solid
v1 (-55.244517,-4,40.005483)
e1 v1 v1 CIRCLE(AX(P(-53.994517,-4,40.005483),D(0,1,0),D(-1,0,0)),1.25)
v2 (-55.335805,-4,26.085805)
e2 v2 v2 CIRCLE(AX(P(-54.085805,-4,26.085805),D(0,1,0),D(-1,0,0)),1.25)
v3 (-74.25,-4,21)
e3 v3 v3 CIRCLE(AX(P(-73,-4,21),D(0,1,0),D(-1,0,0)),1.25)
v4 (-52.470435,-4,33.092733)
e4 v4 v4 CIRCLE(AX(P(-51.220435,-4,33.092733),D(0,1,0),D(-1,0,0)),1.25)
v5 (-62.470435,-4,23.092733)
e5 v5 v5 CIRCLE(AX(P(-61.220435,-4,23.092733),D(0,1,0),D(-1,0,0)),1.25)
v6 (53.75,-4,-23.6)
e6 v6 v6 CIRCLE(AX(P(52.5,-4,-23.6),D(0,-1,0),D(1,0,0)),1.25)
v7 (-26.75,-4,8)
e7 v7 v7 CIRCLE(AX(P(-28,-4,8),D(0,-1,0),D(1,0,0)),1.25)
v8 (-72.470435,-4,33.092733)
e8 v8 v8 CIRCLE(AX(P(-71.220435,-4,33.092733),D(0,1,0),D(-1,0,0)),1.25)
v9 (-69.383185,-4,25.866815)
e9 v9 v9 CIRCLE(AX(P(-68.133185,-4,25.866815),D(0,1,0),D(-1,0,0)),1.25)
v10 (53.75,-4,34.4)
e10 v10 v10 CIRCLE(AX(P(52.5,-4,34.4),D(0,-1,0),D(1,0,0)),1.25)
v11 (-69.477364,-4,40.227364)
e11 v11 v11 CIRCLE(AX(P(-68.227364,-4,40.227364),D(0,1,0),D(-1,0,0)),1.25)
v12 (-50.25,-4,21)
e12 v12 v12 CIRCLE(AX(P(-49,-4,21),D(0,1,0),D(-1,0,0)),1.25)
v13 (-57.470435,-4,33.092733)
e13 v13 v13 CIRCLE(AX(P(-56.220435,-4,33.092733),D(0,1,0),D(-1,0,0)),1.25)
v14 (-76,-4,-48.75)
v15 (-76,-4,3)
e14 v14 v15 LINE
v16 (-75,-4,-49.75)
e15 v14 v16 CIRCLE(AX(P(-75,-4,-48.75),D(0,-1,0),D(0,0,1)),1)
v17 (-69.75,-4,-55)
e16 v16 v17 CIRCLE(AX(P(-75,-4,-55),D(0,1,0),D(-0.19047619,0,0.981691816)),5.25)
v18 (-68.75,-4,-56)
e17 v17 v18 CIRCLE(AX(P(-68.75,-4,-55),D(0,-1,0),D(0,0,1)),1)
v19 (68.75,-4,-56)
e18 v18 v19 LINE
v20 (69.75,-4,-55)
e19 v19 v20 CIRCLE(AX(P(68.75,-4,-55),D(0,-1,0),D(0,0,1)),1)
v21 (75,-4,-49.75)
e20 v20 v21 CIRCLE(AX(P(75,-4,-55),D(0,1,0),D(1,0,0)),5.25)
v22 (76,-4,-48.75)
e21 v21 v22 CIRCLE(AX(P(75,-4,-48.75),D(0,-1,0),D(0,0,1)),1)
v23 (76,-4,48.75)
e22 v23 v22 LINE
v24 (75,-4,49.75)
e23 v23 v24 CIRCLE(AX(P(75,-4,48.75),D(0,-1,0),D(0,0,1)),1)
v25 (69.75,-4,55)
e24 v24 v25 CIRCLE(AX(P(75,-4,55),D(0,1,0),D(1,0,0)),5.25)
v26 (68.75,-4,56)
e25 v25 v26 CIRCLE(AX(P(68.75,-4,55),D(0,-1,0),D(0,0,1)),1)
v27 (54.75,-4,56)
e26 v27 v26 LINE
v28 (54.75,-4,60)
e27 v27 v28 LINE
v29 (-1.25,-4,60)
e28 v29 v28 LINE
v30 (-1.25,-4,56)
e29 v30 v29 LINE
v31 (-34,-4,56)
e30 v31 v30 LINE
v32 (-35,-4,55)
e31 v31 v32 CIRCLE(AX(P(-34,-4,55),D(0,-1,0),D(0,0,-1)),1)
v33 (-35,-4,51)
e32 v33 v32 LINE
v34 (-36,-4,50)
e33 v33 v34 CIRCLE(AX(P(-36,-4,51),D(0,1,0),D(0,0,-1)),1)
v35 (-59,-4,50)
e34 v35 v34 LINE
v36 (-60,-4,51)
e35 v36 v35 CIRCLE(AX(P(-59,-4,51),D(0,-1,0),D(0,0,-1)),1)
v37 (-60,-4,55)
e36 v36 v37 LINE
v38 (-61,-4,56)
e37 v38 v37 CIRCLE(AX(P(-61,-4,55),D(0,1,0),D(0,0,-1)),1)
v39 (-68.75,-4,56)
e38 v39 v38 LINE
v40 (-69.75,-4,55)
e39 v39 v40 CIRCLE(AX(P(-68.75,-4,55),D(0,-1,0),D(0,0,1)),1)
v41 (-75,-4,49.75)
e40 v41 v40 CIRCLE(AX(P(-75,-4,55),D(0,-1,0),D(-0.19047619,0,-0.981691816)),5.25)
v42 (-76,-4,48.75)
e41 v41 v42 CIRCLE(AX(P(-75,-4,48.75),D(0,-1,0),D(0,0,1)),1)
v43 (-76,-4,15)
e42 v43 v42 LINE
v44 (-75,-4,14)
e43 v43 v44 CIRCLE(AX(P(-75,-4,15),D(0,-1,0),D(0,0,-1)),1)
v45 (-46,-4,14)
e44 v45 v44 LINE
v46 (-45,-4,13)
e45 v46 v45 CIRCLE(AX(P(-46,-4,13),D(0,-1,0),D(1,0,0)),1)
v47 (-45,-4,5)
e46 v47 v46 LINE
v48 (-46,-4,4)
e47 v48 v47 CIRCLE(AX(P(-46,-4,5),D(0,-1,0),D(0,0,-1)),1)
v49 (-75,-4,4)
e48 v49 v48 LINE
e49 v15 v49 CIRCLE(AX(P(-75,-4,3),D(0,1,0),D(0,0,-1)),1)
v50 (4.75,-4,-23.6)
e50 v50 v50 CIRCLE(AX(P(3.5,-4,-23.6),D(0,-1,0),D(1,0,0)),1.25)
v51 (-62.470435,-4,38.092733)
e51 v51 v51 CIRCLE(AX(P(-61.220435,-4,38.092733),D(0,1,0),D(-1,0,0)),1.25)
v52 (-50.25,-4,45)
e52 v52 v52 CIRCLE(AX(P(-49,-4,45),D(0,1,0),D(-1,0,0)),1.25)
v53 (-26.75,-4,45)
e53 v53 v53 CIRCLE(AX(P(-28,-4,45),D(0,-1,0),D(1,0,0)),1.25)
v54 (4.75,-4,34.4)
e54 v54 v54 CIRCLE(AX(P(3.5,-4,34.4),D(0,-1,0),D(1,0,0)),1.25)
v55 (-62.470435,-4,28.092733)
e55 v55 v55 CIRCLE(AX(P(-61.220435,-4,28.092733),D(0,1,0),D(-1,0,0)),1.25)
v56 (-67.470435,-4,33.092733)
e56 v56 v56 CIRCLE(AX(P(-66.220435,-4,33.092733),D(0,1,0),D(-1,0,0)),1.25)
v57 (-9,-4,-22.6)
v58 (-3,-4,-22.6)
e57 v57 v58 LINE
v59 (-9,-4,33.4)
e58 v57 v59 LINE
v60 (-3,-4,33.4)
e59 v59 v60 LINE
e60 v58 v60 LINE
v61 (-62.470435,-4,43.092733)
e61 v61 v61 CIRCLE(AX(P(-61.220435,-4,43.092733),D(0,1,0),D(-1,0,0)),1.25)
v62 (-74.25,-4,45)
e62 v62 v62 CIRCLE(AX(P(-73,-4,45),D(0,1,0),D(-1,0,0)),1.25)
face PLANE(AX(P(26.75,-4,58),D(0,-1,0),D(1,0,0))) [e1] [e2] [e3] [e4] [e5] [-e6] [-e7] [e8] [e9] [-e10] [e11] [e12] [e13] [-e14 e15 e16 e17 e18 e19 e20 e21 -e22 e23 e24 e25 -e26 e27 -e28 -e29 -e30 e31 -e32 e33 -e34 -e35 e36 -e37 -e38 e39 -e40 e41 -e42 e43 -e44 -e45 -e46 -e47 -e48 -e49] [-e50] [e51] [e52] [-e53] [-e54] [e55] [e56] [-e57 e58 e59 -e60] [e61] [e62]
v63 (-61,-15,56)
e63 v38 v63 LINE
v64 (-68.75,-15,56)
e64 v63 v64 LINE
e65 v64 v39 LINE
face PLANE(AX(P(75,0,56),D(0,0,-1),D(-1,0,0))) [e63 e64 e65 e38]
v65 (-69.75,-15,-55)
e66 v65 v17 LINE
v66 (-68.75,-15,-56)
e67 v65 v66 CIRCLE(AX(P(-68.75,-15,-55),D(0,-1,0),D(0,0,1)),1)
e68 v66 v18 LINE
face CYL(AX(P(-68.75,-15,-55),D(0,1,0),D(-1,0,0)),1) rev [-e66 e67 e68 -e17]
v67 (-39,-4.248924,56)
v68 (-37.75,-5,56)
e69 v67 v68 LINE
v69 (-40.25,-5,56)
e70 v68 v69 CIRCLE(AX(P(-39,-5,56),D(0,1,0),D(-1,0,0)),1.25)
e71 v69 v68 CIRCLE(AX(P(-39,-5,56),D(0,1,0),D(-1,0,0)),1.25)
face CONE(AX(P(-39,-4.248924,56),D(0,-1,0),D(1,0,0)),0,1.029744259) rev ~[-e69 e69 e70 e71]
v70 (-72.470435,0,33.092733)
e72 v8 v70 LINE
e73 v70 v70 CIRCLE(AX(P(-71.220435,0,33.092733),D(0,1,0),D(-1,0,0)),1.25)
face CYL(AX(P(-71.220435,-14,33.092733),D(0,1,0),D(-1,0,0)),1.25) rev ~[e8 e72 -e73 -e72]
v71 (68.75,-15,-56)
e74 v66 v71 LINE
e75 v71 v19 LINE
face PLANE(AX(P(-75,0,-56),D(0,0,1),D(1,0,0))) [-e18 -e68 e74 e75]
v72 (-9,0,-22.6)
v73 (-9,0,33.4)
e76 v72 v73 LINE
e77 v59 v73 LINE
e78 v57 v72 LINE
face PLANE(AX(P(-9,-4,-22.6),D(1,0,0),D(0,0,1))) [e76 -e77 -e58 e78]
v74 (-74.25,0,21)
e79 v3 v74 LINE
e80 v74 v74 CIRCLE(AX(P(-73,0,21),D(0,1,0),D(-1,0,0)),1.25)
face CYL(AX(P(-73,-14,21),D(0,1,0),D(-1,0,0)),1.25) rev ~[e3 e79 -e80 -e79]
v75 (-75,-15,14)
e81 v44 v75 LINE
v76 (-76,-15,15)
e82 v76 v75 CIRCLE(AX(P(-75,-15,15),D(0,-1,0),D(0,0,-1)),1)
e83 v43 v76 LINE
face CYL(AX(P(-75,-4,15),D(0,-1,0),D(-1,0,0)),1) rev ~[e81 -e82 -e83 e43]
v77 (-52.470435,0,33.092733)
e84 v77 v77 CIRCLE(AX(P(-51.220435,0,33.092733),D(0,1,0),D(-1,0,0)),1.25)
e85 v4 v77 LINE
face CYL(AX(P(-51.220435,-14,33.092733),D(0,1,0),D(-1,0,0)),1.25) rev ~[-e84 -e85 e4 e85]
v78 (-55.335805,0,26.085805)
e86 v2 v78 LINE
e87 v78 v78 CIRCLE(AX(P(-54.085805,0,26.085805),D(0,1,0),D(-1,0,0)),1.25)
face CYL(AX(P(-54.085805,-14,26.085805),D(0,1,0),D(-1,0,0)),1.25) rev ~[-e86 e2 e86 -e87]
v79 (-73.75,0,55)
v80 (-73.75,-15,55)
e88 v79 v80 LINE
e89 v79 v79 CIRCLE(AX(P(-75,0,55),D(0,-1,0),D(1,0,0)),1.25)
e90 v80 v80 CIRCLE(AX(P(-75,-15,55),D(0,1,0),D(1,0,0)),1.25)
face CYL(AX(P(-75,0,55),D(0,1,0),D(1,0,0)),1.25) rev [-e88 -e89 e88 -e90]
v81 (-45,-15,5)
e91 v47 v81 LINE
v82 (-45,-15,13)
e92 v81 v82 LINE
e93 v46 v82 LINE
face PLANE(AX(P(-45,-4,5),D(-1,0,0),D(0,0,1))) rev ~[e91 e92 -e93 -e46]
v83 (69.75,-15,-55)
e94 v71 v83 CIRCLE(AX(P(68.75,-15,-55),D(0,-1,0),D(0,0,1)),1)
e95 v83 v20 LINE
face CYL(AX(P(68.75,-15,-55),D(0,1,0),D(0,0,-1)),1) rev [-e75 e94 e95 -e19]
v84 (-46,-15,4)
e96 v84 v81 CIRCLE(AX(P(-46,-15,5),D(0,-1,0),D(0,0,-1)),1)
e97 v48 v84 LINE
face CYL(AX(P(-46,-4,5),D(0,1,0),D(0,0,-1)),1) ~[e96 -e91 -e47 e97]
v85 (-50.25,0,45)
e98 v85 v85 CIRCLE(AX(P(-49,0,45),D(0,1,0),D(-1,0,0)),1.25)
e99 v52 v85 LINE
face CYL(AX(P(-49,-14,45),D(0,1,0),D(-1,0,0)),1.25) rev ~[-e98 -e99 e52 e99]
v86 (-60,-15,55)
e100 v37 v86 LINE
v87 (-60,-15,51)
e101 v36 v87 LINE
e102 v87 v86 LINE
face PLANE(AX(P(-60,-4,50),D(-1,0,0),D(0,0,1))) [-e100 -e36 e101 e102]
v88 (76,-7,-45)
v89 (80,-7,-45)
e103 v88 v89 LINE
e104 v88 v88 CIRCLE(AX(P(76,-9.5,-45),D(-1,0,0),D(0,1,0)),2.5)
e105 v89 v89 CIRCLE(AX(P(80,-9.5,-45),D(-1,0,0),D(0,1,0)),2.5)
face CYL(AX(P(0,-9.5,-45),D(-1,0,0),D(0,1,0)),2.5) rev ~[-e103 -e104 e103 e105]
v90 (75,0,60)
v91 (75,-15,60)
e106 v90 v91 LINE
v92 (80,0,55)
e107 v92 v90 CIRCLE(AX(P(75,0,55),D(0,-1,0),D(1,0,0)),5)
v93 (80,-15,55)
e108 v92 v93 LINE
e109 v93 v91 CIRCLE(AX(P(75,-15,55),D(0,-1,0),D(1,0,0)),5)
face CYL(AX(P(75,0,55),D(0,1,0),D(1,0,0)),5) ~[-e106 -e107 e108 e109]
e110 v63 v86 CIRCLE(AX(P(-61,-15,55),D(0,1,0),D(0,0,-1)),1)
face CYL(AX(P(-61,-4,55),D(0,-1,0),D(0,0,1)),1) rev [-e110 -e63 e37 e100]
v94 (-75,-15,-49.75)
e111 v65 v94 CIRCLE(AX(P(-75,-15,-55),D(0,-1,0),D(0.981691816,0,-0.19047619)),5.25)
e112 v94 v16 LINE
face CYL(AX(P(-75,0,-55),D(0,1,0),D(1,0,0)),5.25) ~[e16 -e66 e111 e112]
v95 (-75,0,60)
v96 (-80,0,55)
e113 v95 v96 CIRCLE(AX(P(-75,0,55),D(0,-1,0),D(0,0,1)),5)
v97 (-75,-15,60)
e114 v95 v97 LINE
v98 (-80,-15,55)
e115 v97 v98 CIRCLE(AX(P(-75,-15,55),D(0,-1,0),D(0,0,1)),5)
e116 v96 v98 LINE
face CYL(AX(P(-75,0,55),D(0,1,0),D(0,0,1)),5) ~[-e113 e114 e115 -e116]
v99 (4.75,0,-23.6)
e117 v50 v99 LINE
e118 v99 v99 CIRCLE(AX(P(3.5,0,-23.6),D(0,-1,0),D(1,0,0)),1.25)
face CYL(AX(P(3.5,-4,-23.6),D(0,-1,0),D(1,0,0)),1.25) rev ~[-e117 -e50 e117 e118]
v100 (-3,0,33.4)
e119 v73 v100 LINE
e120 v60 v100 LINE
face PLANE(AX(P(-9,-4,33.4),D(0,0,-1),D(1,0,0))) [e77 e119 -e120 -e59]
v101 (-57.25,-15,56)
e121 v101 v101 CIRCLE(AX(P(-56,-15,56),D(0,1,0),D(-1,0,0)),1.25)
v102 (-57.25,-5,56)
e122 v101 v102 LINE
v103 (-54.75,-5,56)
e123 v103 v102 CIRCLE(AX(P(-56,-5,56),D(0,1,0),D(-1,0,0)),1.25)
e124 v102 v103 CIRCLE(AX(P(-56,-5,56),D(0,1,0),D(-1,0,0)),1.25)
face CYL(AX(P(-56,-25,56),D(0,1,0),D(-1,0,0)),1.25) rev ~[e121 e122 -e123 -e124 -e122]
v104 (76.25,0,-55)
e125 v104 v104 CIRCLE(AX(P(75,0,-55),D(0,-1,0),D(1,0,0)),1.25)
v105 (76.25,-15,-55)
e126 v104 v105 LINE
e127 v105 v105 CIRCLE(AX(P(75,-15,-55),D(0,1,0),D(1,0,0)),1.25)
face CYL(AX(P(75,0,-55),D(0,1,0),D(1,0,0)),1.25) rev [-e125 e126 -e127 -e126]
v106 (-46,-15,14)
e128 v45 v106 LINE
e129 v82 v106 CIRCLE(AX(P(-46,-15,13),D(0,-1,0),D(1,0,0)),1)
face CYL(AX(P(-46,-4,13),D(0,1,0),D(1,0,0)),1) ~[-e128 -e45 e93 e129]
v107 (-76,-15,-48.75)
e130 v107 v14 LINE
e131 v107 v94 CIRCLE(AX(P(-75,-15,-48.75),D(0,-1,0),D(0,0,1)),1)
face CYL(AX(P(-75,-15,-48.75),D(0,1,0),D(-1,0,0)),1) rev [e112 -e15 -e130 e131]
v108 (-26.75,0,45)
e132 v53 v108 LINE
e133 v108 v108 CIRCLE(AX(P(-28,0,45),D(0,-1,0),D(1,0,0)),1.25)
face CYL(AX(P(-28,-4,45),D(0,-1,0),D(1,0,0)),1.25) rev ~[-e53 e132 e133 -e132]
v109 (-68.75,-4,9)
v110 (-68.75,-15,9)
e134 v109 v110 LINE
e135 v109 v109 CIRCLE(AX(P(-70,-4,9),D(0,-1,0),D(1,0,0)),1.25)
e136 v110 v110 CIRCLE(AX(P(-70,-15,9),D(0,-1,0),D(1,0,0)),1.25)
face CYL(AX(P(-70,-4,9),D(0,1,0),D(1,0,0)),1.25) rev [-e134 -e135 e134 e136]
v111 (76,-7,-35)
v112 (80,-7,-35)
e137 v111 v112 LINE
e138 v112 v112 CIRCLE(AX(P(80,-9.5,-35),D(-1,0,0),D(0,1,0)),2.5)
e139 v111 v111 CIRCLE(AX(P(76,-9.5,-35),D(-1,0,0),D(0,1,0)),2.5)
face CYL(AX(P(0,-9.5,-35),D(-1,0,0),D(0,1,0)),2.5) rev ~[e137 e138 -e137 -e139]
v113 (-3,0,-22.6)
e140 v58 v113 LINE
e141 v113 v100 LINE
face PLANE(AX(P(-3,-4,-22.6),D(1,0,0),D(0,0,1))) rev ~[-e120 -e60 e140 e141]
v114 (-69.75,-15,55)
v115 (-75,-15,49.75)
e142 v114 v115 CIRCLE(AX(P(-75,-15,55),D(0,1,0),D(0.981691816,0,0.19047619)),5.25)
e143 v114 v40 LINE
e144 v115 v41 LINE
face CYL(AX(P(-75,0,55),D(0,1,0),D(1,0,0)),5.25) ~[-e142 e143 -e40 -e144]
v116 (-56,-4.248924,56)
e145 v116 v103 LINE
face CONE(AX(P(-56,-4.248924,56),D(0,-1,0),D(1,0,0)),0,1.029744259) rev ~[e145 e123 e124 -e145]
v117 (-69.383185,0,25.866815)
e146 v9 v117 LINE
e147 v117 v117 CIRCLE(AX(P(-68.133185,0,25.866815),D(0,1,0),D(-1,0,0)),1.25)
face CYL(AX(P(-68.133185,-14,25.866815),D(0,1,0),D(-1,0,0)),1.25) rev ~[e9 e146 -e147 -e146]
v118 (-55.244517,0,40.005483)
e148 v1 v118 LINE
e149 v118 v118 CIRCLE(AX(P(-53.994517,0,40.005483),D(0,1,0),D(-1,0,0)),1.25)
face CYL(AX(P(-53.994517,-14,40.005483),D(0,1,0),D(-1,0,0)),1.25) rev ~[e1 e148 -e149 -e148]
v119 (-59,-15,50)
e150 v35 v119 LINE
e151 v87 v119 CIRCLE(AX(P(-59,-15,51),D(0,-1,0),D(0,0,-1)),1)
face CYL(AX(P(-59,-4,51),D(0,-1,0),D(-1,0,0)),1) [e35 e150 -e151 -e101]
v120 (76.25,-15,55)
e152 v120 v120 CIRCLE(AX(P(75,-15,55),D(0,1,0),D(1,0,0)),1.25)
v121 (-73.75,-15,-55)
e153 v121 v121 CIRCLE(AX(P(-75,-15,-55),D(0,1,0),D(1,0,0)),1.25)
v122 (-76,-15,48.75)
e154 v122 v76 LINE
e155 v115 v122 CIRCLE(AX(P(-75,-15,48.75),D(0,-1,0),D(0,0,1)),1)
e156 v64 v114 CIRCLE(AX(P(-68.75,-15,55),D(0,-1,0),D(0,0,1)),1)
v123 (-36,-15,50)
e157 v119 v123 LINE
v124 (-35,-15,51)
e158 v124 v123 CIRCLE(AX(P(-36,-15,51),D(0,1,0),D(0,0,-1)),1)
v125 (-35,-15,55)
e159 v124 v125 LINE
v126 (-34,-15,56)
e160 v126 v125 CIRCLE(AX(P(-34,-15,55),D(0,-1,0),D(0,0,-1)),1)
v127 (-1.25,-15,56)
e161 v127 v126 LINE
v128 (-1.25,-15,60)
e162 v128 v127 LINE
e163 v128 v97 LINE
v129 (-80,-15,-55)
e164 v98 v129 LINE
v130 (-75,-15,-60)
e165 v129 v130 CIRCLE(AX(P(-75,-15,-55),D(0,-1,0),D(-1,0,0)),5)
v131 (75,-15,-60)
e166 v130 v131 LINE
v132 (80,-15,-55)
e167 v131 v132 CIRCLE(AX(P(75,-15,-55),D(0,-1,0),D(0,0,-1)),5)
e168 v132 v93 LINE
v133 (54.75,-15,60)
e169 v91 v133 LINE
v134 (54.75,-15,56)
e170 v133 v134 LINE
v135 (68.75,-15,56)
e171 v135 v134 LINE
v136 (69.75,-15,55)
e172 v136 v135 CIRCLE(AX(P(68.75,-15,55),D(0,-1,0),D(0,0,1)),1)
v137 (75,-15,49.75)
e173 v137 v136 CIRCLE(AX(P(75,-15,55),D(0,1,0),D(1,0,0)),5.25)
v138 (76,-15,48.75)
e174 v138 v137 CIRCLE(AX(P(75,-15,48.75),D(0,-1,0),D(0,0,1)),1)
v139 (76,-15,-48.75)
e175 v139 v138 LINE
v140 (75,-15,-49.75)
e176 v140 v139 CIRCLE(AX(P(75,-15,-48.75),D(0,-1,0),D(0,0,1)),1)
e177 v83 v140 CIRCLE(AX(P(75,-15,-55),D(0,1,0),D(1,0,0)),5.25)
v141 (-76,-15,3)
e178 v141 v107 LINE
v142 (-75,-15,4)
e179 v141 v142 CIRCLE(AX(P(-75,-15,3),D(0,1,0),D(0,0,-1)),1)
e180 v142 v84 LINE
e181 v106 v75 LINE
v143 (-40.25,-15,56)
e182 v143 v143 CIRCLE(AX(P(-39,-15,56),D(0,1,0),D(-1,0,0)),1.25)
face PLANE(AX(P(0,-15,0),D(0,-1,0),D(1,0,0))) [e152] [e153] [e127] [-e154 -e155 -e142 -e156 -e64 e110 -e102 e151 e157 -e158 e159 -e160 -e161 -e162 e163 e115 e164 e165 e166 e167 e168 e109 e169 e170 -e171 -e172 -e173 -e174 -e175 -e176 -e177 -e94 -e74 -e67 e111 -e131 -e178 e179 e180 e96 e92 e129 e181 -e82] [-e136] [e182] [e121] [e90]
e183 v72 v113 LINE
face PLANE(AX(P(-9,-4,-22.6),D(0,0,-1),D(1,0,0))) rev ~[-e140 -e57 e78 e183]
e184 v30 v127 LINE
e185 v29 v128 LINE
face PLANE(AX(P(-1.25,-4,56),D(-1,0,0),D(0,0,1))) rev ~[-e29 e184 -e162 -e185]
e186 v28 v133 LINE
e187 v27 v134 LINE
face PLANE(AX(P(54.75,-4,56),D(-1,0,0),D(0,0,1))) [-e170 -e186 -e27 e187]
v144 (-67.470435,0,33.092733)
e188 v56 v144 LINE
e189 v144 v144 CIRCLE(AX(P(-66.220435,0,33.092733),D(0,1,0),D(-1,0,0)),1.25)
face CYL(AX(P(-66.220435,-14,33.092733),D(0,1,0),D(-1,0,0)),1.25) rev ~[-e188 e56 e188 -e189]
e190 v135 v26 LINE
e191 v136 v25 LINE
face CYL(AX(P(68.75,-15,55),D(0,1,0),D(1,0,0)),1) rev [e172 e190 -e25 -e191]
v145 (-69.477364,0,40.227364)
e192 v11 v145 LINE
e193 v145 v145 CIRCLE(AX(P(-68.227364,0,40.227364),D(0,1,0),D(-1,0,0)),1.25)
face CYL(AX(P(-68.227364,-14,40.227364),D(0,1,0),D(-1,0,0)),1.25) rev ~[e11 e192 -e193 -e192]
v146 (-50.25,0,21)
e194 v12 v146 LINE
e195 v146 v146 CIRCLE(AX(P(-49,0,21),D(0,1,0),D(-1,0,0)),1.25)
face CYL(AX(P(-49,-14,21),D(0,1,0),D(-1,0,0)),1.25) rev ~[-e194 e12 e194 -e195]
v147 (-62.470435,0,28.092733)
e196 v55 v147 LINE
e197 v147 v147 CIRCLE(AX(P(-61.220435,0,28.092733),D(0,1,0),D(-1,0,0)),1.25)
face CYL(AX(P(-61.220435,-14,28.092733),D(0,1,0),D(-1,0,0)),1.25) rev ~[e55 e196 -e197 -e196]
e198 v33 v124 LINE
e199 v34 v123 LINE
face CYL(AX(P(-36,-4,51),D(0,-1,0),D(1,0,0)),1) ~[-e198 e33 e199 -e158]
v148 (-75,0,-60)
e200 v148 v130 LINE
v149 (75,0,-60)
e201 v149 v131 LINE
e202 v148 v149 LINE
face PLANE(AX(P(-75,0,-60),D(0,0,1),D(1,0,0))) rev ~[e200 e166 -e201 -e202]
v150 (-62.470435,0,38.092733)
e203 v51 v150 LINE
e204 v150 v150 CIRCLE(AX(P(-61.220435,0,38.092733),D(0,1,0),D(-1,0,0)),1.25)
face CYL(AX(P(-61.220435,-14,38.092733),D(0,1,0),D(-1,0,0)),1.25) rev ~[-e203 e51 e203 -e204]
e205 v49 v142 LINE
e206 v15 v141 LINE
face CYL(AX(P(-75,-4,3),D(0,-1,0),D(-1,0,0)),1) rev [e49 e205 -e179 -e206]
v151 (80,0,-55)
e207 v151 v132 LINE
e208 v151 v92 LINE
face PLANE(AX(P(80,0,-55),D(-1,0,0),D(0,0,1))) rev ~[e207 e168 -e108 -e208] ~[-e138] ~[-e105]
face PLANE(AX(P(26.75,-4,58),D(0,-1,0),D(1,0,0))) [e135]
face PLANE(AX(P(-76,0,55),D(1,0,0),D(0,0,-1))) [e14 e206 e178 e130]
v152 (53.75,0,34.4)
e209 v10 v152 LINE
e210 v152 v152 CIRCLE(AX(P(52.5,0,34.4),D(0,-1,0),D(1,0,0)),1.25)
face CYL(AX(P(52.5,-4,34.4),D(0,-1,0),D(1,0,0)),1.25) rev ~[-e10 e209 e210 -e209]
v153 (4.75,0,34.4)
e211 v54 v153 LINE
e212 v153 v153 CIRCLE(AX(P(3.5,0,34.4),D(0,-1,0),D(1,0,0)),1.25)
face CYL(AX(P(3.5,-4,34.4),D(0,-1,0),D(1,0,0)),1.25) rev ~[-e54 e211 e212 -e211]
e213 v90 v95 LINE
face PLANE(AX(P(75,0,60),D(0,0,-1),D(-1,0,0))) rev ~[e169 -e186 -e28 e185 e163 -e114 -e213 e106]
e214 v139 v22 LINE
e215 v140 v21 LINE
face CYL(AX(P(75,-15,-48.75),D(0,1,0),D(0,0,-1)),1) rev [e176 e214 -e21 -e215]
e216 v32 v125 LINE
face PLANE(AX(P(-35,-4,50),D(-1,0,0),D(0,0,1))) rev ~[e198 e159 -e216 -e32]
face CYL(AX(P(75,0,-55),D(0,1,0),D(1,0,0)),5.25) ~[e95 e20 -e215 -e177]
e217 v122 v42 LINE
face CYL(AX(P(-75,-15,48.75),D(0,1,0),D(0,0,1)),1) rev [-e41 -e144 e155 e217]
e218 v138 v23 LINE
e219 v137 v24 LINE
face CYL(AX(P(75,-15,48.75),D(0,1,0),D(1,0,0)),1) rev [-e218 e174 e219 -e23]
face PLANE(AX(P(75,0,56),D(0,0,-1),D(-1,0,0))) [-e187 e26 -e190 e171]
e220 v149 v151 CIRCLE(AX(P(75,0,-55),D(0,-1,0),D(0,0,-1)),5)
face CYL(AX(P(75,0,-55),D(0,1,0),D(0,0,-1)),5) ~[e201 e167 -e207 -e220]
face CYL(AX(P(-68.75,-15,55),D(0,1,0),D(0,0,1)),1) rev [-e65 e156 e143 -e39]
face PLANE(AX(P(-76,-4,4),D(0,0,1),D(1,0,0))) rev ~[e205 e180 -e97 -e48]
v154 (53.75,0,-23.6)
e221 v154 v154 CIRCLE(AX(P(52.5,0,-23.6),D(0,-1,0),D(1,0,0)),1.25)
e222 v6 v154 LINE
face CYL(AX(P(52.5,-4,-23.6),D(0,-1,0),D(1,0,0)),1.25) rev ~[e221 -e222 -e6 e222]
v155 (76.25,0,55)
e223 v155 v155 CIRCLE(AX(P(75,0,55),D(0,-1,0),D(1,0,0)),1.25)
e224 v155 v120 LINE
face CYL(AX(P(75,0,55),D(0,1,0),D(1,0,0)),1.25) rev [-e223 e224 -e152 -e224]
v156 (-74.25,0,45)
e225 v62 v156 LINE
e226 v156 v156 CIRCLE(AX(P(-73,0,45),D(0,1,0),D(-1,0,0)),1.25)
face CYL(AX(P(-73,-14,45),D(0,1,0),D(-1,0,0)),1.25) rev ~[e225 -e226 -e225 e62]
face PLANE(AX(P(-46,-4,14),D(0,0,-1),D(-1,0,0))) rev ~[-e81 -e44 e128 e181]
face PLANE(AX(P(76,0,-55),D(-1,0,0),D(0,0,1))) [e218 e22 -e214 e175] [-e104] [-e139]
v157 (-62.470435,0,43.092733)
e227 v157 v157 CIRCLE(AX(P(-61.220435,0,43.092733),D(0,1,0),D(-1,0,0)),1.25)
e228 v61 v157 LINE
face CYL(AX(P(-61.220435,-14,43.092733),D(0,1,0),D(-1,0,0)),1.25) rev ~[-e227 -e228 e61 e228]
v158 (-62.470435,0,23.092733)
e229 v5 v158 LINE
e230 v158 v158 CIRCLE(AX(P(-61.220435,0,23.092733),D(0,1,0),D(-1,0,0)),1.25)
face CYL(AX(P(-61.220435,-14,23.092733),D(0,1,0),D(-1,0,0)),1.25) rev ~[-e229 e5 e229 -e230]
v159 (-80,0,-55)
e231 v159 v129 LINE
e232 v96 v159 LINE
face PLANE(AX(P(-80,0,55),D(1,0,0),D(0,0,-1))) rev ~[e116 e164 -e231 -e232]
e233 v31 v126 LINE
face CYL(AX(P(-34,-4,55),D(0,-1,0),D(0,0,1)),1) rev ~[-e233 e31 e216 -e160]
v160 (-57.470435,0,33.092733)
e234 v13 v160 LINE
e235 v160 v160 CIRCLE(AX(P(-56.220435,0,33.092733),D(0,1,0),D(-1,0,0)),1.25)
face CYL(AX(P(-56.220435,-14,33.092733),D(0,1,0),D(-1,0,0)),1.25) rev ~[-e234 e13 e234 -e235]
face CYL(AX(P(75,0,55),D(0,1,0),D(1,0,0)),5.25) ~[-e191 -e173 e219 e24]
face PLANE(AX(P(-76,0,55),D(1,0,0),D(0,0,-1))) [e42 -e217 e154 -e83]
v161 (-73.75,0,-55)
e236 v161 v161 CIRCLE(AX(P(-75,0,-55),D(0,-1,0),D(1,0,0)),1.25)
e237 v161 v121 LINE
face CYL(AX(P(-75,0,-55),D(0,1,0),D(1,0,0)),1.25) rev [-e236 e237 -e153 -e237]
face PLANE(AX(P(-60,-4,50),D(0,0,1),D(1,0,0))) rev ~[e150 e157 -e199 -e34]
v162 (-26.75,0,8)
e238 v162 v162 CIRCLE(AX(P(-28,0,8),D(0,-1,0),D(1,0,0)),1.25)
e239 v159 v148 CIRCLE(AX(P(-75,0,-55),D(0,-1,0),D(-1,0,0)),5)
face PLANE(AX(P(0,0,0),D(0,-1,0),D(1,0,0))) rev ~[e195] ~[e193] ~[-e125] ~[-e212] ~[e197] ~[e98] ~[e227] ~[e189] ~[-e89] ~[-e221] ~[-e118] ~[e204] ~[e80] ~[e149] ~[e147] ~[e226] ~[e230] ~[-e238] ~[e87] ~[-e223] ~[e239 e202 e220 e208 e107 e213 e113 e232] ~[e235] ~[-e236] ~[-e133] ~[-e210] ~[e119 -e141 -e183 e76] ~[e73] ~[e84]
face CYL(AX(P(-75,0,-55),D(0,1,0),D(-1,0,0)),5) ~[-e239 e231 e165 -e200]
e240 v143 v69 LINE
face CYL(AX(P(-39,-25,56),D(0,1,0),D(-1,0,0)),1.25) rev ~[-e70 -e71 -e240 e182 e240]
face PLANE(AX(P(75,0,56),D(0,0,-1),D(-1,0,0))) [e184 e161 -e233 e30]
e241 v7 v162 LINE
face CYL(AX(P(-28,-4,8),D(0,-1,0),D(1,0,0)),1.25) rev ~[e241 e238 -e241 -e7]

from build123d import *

# Parameters (mm, degrees)
F1_DEPTH  = 15
F2_R      = 1.25
F3_DEPTH  = 25
F4_T      = 4
F5_R      = 1.25
F6_DEPTH  = 25
F7_W      = 56
F7_H      = 4
F8_DEPTH  = 25
F9_W      = 25
F9_H      = 6
F10_DEPTH = 11
F11_R     = 1
F13_D     = 2.5
F13_DEPTH = 10
F13_TIP   = 0.7510757738
F15_D     = 2.5
F15_DEPTH = 10
F15_TIP   = 0.7510757738
F16_R     = 1.25
F17_DEPTH = 11
F18_R     = 1
F20_D     = 2.5
F20_DEPTH = 10
F20_TIP   = 0.7510757738
F21_W     = 6
F21_H     = 56
F22_DEPTH = 25
F24_D     = 5
F24_DEPTH = 100
F24_TIP   = 1.5021515476
F25_R     = 1.25
F26_DEPTH = 5


# Not quite as in the source:
# - a shell that OpenCascade refuses in one call is made with other operations: the cavity is built on its own and cut out


with BuildPart() as f1:
    # F0 (on Front) → F1 (new body)
    with BuildSketch(Plane.XZ):
        with BuildLine():
            Line((-75, -60), (75, -60))
            ThreePointArc((75, -60), (78.5355339059, -58.5355339059), (80, -55))
            Line((80, -55), (80, 55))
            ThreePointArc((80, 55), (78.5355339059, 58.5355339059), (75, 60))
            Line((75, 60), (-75, 60))
            ThreePointArc((-75, 60), (-78.5355339059, 58.5355339059), (-80, 55))
            Line((-80, 55), (-80, -55))
            ThreePointArc((-80, -55), (-78.5355339059, -58.5355339059), (-75, -60))
        make_face()
    extrude(amount=F1_DEPTH)

    # F2 (on Front) → F3 (cut)
    with BuildSketch(Plane.XZ):
        with Locations((-75, 55)):
            Circle(F2_R)
        with Locations((75, 55)):
            Circle(F2_R)
        with Locations((75, -55)):
            Circle(F2_R)
        with Locations((-75, -55)):
            Circle(F2_R)
    extrude(amount=F3_DEPTH, mode=Mode.SUBTRACT)

    # F4: shell of thickness 4, made by hand


with BuildPart() as f4_core1:
    # F4_t2: copy of F1
    add(f1.part)

    # the walls: a layer under each face that stays
    f4_faces = [f4_core1.faces().sort_by_distance(p)[0] for p in [
        (0, -7.5, -60),
        (-78.5355339059, -7.5, -58.5355339059),
        (78.5355339059, -7.5, -58.5355339059),
        (0, 0, 0),
        (-80, -7.5, 0),
        (80, -7.5, 0),
        (-78.5355339059, -7.5, 58.5355339059),
        (78.5355339059, -7.5, 58.5355339059),
        (0, -7.5, 60),
        (-76.25, -7.5, -55),
        (73.75, -7.5, -55),
        (-76.25, -7.5, 55),
        (73.75, -7.5, 55),
    ]]
    thicken(f4_faces, amount=-F4_T, mode=Mode.SUBTRACT)


with BuildPart() as f1_1:
    add(f1.part)

    # what is left inside the walls is the cavity
    f4_cavity = [f4_core1.part.solids().sort_by_distance(p)[0] for p in [
        (0, -4.04, -18.666667),
    ]]
    add(f4_cavity, mode=Mode.SUBTRACT)

    # F5 (on face) → F6 (cut)
    with BuildSketch(Plane.XZ.offset(4)):
        with Locations((3.5, 34.4)):
            Circle(F5_R)
        with Locations((52.5, 34.4)):
            Circle(F5_R)
        with Locations((52.5, -23.6)):
            Circle(F5_R)
        with Locations((3.5, -23.6)):
            Circle(F5_R)
    extrude(amount=-F6_DEPTH, mode=Mode.SUBTRACT)

    # F7 (on face) → F8 (cut)
    with BuildSketch(Plane.XZ.offset(4)):
        with Locations((26.75, 58)):
            Rectangle(F7_W, F7_H)
    extrude(amount=F8_DEPTH, mode=Mode.SUBTRACT)

    # F9 (on face) → F10 (join)
    with BuildSketch(Plane.XZ.offset(4)):
        with Locations((-47.5, 53)):
            Rectangle(F9_W, F9_H)
    extrude(amount=F10_DEPTH)

    # F11
    f11_edges = [f1_1.edges().sort_by_distance(p)[0] for p in [
        (-60, -9.5, 56),
        (-60, -9.5, 50),
        (-35, -9.5, 50),
        (-35, -9.5, 56),
    ]]
    fillet(f11_edges, radius=F11_R)

    # F13
    with Locations(Plane.XZ.offset(15)):
        with Locations((-56, 56), (-39, 56)):
            Hole(F13_D / 2, depth=F13_DEPTH)
            with Locations((0, 0, -(F13_DEPTH + F13_TIP / 2))):  # 118° drill point
                Cone(0, F13_D / 2, F13_TIP, mode=Mode.SUBTRACT)

    # F15
    with Locations(Plane.XZ.offset(4)):
        with Locations((-49, 45), (-73, 45), (-73, 21), (-49, 21)):
            Hole(F15_D / 2, depth=F15_DEPTH)
            with Locations((0, 0, -(F15_DEPTH + F15_TIP / 2))):  # 118° drill point
                Cone(0, F15_D / 2, F15_TIP, mode=Mode.SUBTRACT)

    # F16 (on face) → F17 (join)
    with BuildSketch(Plane.XZ.offset(4)):
        with BuildLine():
            Line((-76, 14), (-76, 4))
            Line((-76, 4), (-46, 4))
            ThreePointArc((-46, 4), (-45.2928932188, 4.2928932188), (-45, 5))
            Line((-45, 5), (-45, 13))
            ThreePointArc((-45, 13), (-45.2928932188, 13.7071067812), (-46, 14))
            Line((-46, 14), (-76, 14))
        make_face()
        with Locations((-70, 9)):
            Circle(F16_R, mode=Mode.SUBTRACT)
    extrude(amount=F17_DEPTH)

    # F18
    f18_edges = [f1_1.edges().sort_by_distance(p)[0] for p in [
        (-76, -9.5, 14),
        (-76, -9.5, 4),
        (-69.846118, -9.5, 56),
        (-76, -9.5, 49.846118),
        (-76, -9.5, -49.846118),
        (-69.846118, -9.5, -56),
        (69.846118, -9.5, -56),
        (76, -9.5, -49.846118),
        (76, -9.5, 49.846118),
        (69.846118, -9.5, 56),
    ]]
    fillet(f18_edges, radius=F18_R)

    # F20
    with Locations(Plane.XZ.offset(4)):
        with Locations((-61.220435021, 43.0927334726), (-61.220435021, 38.0927334726), (-68.2273637709, 40.2273637709), (-71.220435021, 33.0927334726), (-66.220435021, 33.0927334726), (-68.1331846448, 25.8668153552), (-61.220435021, 28.0927334726), (-61.220435021, 23.0927334726), (-53.9945169036, 40.0054830964), (-56.220435021, 33.0927334726), (-54.0858047227, 26.0858047227), (-51.220435021, 33.0927334726)):
            Hole(F20_D / 2, depth=F20_DEPTH)
            with Locations((0, 0, -(F20_DEPTH + F20_TIP / 2))):  # 118° drill point
                Cone(0, F20_D / 2, F20_TIP, mode=Mode.SUBTRACT)

    # F21 (on face) → F22 (cut)
    with BuildSketch(Plane.XZ.offset(4)):
        with Locations((-6, 5.4)):
            Rectangle(F21_W, F21_H)
    extrude(amount=-F22_DEPTH, mode=Mode.SUBTRACT)

    # F24 (one way)
    with BuildSketch(Plane(origin=(0, 0, 0), x_dir=(0, 1, 0), z_dir=(-1, 0, 0))):
        with Locations((-9.5, 35), (-9.5, 45)):
            Circle(F24_D / 2)
    extrude(amount=-F24_DEPTH, mode=Mode.SUBTRACT)
    with Locations(Plane(origin=(0, 0, 0), x_dir=(0, 1, 0), z_dir=(-1, 0, 0))):
        with Locations((-9.5, 35), (-9.5, 45)):
            with Locations((0, 0, -(F24_DEPTH + F24_TIP / 2))):  # 118° drill point
                Cone(0, F24_D / 2, F24_TIP, mode=Mode.SUBTRACT)

    # F25 (on face) → F26 (cut)
    with BuildSketch(Plane.XZ.offset(4)):
        with Locations((-28, 45)):
            Circle(F25_R)
        with Locations((-28, 8)):
            Circle(F25_R)
    extrude(amount=-F26_DEPTH, mode=Mode.SUBTRACT)


solid = f1_1.part
